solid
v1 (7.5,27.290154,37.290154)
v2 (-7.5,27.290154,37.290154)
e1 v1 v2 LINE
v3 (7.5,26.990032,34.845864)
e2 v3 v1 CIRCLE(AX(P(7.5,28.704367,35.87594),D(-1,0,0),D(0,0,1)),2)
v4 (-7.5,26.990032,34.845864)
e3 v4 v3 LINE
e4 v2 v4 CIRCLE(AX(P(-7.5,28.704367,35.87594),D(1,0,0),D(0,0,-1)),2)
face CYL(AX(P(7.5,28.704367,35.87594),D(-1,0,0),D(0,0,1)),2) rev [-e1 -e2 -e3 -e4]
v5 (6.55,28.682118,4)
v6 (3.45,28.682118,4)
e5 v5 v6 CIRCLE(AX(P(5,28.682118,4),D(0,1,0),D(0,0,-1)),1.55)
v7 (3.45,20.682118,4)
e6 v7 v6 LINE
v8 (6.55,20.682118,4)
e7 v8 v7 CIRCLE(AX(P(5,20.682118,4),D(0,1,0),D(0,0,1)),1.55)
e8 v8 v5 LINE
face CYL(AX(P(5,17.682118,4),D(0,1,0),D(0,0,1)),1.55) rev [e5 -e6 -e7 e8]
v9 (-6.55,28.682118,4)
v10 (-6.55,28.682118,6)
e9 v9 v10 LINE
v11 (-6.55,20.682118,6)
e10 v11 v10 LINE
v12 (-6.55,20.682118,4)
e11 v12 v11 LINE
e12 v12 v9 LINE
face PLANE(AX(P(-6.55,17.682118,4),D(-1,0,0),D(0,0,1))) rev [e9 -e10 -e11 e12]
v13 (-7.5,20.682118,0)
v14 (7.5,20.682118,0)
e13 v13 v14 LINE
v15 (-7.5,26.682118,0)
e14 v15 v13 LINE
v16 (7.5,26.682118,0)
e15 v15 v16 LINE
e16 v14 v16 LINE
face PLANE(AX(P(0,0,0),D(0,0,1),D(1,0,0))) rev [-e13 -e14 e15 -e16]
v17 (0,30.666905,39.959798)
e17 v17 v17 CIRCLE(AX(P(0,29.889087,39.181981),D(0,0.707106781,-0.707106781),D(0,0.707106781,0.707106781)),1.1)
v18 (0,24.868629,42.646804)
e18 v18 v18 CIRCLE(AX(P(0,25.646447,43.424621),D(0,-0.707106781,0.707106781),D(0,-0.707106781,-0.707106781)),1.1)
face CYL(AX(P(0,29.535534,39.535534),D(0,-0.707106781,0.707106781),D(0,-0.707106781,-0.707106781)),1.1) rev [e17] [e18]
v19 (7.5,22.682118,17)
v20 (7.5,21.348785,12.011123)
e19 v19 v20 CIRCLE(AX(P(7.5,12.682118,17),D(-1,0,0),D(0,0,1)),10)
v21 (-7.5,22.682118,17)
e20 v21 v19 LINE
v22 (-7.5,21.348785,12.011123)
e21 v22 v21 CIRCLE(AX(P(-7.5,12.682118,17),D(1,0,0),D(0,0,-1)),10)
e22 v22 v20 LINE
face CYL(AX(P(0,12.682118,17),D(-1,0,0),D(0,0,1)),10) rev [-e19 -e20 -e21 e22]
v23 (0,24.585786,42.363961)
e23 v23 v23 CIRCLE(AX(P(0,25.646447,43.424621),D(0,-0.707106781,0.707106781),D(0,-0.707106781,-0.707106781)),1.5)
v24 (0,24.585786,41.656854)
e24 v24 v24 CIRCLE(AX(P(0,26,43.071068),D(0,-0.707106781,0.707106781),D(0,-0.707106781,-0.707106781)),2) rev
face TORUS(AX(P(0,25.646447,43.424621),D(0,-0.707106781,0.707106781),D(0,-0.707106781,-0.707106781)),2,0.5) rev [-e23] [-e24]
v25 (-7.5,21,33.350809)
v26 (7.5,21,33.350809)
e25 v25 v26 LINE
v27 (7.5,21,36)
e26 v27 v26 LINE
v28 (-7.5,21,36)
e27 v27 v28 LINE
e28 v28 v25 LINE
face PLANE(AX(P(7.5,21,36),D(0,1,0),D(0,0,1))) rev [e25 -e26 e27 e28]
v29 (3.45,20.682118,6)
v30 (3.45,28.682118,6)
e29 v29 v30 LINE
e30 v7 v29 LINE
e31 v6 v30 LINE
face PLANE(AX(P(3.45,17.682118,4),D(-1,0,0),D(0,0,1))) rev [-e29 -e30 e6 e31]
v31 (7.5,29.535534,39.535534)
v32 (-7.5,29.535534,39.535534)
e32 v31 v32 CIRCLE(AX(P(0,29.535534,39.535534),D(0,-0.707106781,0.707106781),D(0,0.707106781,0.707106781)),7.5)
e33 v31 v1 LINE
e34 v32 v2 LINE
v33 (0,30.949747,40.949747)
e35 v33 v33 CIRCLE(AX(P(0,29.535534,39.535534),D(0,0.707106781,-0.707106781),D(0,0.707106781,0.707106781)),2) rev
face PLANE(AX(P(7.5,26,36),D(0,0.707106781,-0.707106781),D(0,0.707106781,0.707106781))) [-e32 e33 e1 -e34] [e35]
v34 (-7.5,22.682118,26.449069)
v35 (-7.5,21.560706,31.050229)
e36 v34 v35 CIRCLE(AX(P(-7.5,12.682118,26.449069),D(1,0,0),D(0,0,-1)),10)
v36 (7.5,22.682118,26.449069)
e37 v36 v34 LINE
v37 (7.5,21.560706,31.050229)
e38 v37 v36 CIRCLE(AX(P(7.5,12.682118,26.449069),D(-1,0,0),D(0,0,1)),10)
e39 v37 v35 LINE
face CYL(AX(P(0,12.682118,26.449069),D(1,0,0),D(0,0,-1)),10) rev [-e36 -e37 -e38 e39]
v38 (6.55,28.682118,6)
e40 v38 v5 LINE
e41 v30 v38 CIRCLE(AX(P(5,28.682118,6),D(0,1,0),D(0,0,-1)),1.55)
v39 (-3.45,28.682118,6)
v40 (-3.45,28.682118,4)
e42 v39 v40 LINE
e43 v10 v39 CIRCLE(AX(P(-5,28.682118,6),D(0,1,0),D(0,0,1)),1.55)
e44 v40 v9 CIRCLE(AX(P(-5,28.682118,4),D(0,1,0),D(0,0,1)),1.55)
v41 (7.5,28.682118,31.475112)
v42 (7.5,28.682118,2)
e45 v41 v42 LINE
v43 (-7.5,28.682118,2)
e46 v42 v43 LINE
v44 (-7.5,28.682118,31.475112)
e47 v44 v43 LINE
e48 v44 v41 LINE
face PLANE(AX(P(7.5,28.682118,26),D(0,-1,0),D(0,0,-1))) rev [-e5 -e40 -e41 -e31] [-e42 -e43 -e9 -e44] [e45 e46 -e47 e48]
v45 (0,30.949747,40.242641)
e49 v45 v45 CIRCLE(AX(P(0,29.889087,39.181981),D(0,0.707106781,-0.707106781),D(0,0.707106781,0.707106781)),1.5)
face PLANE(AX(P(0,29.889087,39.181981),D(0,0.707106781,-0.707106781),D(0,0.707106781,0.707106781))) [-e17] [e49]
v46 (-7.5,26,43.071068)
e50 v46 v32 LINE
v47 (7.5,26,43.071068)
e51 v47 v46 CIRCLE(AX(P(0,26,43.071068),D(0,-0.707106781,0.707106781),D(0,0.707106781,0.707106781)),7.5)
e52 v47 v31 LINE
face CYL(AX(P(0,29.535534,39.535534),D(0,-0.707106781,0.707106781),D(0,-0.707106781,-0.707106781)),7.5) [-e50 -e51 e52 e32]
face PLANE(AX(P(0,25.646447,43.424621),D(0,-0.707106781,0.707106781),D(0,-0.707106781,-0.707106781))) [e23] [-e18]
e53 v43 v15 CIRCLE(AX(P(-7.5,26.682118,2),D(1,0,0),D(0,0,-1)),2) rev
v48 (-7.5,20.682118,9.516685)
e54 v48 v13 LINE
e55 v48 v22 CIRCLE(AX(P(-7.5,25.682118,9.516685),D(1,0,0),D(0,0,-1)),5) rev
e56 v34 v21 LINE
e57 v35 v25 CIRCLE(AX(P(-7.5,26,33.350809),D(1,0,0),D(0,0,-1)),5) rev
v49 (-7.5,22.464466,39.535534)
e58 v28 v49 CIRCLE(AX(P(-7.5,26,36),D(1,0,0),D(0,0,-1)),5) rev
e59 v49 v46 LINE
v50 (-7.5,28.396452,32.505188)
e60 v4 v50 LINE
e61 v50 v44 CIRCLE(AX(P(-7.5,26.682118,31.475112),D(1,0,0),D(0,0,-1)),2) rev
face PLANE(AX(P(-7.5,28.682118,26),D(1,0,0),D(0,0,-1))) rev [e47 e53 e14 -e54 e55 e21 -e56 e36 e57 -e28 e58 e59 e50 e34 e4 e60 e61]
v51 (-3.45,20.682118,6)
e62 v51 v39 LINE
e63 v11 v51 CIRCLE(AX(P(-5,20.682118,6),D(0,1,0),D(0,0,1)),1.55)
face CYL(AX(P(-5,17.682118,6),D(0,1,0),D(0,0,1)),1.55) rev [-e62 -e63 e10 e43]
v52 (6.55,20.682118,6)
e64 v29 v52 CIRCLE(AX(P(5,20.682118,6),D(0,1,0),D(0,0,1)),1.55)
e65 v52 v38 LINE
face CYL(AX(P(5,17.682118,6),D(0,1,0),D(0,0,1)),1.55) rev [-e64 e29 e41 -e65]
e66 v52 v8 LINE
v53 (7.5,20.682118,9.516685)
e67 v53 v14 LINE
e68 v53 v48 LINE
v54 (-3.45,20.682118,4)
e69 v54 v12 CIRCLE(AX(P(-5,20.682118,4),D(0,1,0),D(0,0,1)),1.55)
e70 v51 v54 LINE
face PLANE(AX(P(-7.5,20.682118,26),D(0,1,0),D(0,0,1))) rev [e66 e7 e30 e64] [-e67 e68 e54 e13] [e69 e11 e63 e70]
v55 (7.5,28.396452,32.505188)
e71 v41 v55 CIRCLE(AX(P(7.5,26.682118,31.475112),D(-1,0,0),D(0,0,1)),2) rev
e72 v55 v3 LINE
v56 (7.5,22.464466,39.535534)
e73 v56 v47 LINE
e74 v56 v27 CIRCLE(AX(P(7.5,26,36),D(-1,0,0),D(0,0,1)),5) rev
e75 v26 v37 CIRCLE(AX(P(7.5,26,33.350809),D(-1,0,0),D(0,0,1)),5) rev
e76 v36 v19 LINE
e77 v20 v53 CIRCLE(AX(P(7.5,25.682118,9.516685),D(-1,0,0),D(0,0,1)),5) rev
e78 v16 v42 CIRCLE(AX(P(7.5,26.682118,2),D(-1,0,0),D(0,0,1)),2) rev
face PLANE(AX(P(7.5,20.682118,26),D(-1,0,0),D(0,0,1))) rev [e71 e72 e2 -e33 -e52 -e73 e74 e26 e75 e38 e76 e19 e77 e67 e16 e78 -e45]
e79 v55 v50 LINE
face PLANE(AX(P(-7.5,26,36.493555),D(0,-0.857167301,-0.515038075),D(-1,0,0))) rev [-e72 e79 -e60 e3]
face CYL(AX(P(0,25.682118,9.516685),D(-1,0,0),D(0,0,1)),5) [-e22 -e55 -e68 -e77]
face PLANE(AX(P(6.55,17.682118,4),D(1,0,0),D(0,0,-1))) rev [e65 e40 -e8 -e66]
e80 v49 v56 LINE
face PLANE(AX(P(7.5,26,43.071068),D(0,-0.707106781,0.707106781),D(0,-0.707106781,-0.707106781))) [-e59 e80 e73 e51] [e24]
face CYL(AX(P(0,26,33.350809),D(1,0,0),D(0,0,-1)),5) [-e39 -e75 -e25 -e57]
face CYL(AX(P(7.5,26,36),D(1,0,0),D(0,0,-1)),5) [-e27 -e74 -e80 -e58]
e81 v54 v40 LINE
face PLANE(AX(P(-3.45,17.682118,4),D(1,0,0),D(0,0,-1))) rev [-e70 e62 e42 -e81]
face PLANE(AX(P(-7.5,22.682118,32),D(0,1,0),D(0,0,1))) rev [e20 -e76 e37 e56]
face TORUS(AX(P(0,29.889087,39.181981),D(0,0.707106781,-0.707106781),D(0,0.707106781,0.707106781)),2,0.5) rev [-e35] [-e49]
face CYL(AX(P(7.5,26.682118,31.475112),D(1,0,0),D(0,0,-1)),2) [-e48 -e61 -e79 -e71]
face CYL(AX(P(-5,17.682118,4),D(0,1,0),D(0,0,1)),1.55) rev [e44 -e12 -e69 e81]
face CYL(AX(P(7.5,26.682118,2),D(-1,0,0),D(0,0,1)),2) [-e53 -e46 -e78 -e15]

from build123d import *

# Parameters (mm, degrees)
SKETCH_10_W         = 15
SKETCH_10_H         = 8
EXTRUDE_7_DEPTH     = 26
CUT_EXTRUDE_4_DEPTH = 11
SKETCH_12_W         = 15
SKETCH_12_H         = 6
EXTRUDE_8_DEPTH     = 6
SKETCH_14_W         = 15
SKETCH_14_H         = 5
EXTRUDE_9_DEPTH     = 4
EXTRUDE_10_DEPTH    = 15
EXTRUDE_11_DEPTH    = 5
SKETCH_19_R         = 1.1
CUT_EXTRUDE_5_DEPTH = 5
EXTRUDE_START       = 0.5
SKETCH_20_R         = 1.5
SKETCH_20_R_2       = 1.1
EXTRUDE_12_DEPTH    = 0.5
SKETCH_21_R         = 1.5
SKETCH_21_R_2       = 1.1
EXTRUDE_13_DEPTH    = 0.5
FILLET_4_R          = 0.5
CHAMFER_1_SIZE      = 4.493554602
CHAMFER_1_SIZE_2    = 2.7
FILLET_7_R          = 2
SKETCH_22_W         = 15
SKETCH_22_H         = 2
CUT_EXTRUDE_6_DEPTH = 15
FILLET_8_R          = 10
FILLET_9_R          = 5
FILLET_10_R         = 2


# Some blends are built 0.0001 mm under size
with BuildPart() as part:
    # 草图10 → 凸台-拉伸7 (new body)
    with BuildSketch(Plane.XY):
        with Locations((0, 24.68211788)):
            Rectangle(SKETCH_10_W, SKETCH_10_H)
    extrude(amount=EXTRUDE_7_DEPTH)

    # 草图11 → 切除-拉伸4 (cut)
    with BuildSketch(Plane(origin=(0, 28.68211788, 0), x_dir=(1, 0, 0), z_dir=(0, 1, 0))):
        with BuildLine():
            Line((-3.45, -4), (-3.45, -6))
            ThreePointArc((-3.45, -6), (-5, -7.55), (-6.55, -6))
            Line((-6.55, -6), (-6.55, -4))
            ThreePointArc((-6.55, -4), (-5, -2.45), (-3.45, -4))
        make_face()
        with BuildLine():
            Line((3.45, -4), (3.45, -6))
            ThreePointArc((3.45, -6), (5, -7.55), (6.55, -6))
            Line((6.55, -6), (6.55, -4))
            ThreePointArc((6.55, -4), (5, -2.45), (3.45, -4))
        make_face()
    extrude(amount=-CUT_EXTRUDE_4_DEPTH, mode=Mode.SUBTRACT)

    # 草图12 → 凸台-拉伸8 (add)
    with BuildSketch(Plane.XY.offset(26)):
        with Locations((0, 25.68211788)):
            Rectangle(SKETCH_12_W, SKETCH_12_H)
    extrude(amount=EXTRUDE_8_DEPTH)

    # 草图14 → 凸台-拉伸9 (add)
    with BuildSketch(Plane.XY.offset(32)):
        with Locations((0, 23.5)):
            Rectangle(SKETCH_14_W, SKETCH_14_H)
    extrude(amount=EXTRUDE_9_DEPTH)

    # 草图17 → 凸台-拉伸10 (add)
    with BuildSketch(Plane.ZY.offset(7.5)):
        Polygon((36, 26), (39.535533906, 29.535533906), (43.071067812, 26), (38.071067812, 21), (36, 21), align=None)
    extrude(amount=-EXTRUDE_10_DEPTH)

    # 草图18 → 凸台-拉伸11 (add)
    with BuildSketch(Plane(origin=(0, -8.535533906, 8.535533906), x_dir=(1, 0, 0), z_dir=(0, -0.7071067811865507, 0.7071067811865445))):
        with BuildLine():
            Line((7.5, 48.840620434), (-7.5, 48.840620434))
            ThreePointArc((-7.5, 48.840620434), (0, 56.340620434), (7.5, 48.840620434))
        make_face()
    extrude(amount=-EXTRUDE_11_DEPTH)

    # 草图19 → 切除-拉伸5 (cut)
    with BuildSketch(Plane(origin=(0, -8.535533906, 8.535533906), x_dir=(1, 0, 0), z_dir=(0, -0.7071067811865507, 0.7071067811865445))):
        with Locations(Location((0, 48.840620434, 0), (0, 0, 270))):
            Circle(SKETCH_19_R)
    extrude(amount=-CUT_EXTRUDE_5_DEPTH, mode=Mode.SUBTRACT)

    # 草图20 → 凸台-拉伸12 (add)
    with BuildSketch(Plane(origin=(0, -8.535533906, 8.535533906), x_dir=(1, 0, 0), z_dir=(0, -0.7071067811865507, 0.7071067811865445)).offset(EXTRUDE_START)):
        with Locations(Location((0, 48.840620434, 0), (0, 0, 270))):
            Circle(SKETCH_20_R)
        with Locations(Location((0, 48.840620434, 0), (0, 0, 270))):
            Circle(SKETCH_20_R_2, mode=Mode.SUBTRACT)
    extrude(amount=-EXTRUDE_12_DEPTH)

    # 草图21 → 凸台-拉伸13 (add)
    with BuildSketch(Plane(origin=(0, -5, 5), x_dir=(1, 0, 0), z_dir=(0, 0.7071067811865513, -0.7071067811865437))):
        with Locations(Location((0, -48.840620434, 0), (0, 0, 90))):
            Circle(SKETCH_21_R)
        with Locations(Location((0, -48.840620434, 0), (0, 0, 90))):
            Circle(SKETCH_21_R_2, mode=Mode.SUBTRACT)
    extrude(amount=EXTRUDE_13_DEPTH)

    # 圆角4
    fillet_4_edges = [part.edges().sort_by_distance(p)[0] for p in [
        (0, 27.060660172, 44.131727984),
        (0, 30.596194078, 40.596194078),
    ]]
    fillet(fillet_4_edges, radius=FILLET_4_R - 0.0001)  # a hair under: the kernel refuses the full size

    # 倒角1
    # the kernel refuses this chamfer: 4.493554602, 2.7 mm, written as the material it adds along each edge
    with BuildSketch(Plane(origin=(-7.5, 26, 32), x_dir=(0, -0.019914630580833353, 0.9998016840798123), z_dir=(1, 0, 0))) as chamfer_1_piece_1_section:
        Polygon((CHAMFER_1_SIZE * 0.999801684157, -CHAMFER_1_SIZE * 0.0199146305824), (-CHAMFER_1_SIZE_2 * 0.0199146305808, -CHAMFER_1_SIZE_2 * 0.99980168408), (0, 0), align=None)
    chamfer_1_piece_1 = extrude(amount=15, mode=Mode.PRIVATE)
    chamfer_1_piece_1 = split(chamfer_1_piece_1, bisect_by=Plane(origin=(0, 28.68211788, 33.477199106), z_dir=(0, -1, 0)), keep=Keep.TOP, mode=Mode.PRIVATE)
    add(chamfer_1_piece_1)

    # 圆角7
    fillet_7_edges = [part.edges().sort_by_distance(p)[0] for p in [
        (0, 26.18524881, 36.18524881),
        (0, 28.68211788, 32.029760846),
    ]]
    fillet(fillet_7_edges, radius=FILLET_7_R)

    # 草图22 → 切除-拉伸6 (cut)
    with BuildSketch(Plane.XY.offset(26)):
        with Locations((0, 21.68211788)):
            Rectangle(SKETCH_22_W, SKETCH_22_H)
    extrude(amount=-CUT_EXTRUDE_6_DEPTH, mode=Mode.SUBTRACT)

    # 圆角8
    # the kernel refuses this fillet: 10 mm, written as the material it adds along each edge
    with BuildSketch(Plane(origin=(7.5, 22.68211788, 11), x_dir=(0, -1, 0), z_dir=(-1, 0, 0))) as fillet_8_piece_1:
        with BuildLine():
            CenterArc((10, 6), FILLET_8_R, 180, 36.869897646)
            Line((0, 6), (-0.2, 6))
            Line((-0.2, 6), (-0.2, 0))
            Line((-0.2, 0), (0, -0.2))
            ThreePointArc((0, -0.2), (1, -0.2), (1.84, -0.12))
            Line((1.84, -0.12), (2, 0))
        make_face()
    extrude(amount=15)
    with BuildSketch(Plane(origin=(7.5, 22.68211788, 32), x_dir=(0, 0, -1), z_dir=(-1, 0, 0))) as fillet_8_piece_2:
        with BuildLine():
            CenterArc((5.550931186, 10), FILLET_8_R, 236.282871199, 33.717128801)
            Line((0, 1.68211788), (-0.111018624, 1.515760238))
            ThreePointArc((-0.111018624, 1.515760238), (-0.2, 0.84105894), (-0.2, 0))
            Line((-0.2, 0), (0, -0.2))
            Line((0, -0.2), (5.550931186, -0.2))
            Line((5.550931186, -0.2), (5.550931186, 0))
        make_face()
    extrude(amount=15)

    # 圆角9
    fillet_9_edges = [part.edges().sort_by_distance(p)[0] for p in [
        (0, 20.68211788, 11),
        (0, 21, 32),
        (0, 21, 38.071067812),
    ]]
    fillet(fillet_9_edges, radius=FILLET_9_R)

    # 圆角10
    fillet_10_edges = [part.edges().sort_by_distance(p)[0] for p in [
        (0, 28.68211788, 0),
    ]]
    fillet(fillet_10_edges, radius=FILLET_10_R)


solid = part.part
